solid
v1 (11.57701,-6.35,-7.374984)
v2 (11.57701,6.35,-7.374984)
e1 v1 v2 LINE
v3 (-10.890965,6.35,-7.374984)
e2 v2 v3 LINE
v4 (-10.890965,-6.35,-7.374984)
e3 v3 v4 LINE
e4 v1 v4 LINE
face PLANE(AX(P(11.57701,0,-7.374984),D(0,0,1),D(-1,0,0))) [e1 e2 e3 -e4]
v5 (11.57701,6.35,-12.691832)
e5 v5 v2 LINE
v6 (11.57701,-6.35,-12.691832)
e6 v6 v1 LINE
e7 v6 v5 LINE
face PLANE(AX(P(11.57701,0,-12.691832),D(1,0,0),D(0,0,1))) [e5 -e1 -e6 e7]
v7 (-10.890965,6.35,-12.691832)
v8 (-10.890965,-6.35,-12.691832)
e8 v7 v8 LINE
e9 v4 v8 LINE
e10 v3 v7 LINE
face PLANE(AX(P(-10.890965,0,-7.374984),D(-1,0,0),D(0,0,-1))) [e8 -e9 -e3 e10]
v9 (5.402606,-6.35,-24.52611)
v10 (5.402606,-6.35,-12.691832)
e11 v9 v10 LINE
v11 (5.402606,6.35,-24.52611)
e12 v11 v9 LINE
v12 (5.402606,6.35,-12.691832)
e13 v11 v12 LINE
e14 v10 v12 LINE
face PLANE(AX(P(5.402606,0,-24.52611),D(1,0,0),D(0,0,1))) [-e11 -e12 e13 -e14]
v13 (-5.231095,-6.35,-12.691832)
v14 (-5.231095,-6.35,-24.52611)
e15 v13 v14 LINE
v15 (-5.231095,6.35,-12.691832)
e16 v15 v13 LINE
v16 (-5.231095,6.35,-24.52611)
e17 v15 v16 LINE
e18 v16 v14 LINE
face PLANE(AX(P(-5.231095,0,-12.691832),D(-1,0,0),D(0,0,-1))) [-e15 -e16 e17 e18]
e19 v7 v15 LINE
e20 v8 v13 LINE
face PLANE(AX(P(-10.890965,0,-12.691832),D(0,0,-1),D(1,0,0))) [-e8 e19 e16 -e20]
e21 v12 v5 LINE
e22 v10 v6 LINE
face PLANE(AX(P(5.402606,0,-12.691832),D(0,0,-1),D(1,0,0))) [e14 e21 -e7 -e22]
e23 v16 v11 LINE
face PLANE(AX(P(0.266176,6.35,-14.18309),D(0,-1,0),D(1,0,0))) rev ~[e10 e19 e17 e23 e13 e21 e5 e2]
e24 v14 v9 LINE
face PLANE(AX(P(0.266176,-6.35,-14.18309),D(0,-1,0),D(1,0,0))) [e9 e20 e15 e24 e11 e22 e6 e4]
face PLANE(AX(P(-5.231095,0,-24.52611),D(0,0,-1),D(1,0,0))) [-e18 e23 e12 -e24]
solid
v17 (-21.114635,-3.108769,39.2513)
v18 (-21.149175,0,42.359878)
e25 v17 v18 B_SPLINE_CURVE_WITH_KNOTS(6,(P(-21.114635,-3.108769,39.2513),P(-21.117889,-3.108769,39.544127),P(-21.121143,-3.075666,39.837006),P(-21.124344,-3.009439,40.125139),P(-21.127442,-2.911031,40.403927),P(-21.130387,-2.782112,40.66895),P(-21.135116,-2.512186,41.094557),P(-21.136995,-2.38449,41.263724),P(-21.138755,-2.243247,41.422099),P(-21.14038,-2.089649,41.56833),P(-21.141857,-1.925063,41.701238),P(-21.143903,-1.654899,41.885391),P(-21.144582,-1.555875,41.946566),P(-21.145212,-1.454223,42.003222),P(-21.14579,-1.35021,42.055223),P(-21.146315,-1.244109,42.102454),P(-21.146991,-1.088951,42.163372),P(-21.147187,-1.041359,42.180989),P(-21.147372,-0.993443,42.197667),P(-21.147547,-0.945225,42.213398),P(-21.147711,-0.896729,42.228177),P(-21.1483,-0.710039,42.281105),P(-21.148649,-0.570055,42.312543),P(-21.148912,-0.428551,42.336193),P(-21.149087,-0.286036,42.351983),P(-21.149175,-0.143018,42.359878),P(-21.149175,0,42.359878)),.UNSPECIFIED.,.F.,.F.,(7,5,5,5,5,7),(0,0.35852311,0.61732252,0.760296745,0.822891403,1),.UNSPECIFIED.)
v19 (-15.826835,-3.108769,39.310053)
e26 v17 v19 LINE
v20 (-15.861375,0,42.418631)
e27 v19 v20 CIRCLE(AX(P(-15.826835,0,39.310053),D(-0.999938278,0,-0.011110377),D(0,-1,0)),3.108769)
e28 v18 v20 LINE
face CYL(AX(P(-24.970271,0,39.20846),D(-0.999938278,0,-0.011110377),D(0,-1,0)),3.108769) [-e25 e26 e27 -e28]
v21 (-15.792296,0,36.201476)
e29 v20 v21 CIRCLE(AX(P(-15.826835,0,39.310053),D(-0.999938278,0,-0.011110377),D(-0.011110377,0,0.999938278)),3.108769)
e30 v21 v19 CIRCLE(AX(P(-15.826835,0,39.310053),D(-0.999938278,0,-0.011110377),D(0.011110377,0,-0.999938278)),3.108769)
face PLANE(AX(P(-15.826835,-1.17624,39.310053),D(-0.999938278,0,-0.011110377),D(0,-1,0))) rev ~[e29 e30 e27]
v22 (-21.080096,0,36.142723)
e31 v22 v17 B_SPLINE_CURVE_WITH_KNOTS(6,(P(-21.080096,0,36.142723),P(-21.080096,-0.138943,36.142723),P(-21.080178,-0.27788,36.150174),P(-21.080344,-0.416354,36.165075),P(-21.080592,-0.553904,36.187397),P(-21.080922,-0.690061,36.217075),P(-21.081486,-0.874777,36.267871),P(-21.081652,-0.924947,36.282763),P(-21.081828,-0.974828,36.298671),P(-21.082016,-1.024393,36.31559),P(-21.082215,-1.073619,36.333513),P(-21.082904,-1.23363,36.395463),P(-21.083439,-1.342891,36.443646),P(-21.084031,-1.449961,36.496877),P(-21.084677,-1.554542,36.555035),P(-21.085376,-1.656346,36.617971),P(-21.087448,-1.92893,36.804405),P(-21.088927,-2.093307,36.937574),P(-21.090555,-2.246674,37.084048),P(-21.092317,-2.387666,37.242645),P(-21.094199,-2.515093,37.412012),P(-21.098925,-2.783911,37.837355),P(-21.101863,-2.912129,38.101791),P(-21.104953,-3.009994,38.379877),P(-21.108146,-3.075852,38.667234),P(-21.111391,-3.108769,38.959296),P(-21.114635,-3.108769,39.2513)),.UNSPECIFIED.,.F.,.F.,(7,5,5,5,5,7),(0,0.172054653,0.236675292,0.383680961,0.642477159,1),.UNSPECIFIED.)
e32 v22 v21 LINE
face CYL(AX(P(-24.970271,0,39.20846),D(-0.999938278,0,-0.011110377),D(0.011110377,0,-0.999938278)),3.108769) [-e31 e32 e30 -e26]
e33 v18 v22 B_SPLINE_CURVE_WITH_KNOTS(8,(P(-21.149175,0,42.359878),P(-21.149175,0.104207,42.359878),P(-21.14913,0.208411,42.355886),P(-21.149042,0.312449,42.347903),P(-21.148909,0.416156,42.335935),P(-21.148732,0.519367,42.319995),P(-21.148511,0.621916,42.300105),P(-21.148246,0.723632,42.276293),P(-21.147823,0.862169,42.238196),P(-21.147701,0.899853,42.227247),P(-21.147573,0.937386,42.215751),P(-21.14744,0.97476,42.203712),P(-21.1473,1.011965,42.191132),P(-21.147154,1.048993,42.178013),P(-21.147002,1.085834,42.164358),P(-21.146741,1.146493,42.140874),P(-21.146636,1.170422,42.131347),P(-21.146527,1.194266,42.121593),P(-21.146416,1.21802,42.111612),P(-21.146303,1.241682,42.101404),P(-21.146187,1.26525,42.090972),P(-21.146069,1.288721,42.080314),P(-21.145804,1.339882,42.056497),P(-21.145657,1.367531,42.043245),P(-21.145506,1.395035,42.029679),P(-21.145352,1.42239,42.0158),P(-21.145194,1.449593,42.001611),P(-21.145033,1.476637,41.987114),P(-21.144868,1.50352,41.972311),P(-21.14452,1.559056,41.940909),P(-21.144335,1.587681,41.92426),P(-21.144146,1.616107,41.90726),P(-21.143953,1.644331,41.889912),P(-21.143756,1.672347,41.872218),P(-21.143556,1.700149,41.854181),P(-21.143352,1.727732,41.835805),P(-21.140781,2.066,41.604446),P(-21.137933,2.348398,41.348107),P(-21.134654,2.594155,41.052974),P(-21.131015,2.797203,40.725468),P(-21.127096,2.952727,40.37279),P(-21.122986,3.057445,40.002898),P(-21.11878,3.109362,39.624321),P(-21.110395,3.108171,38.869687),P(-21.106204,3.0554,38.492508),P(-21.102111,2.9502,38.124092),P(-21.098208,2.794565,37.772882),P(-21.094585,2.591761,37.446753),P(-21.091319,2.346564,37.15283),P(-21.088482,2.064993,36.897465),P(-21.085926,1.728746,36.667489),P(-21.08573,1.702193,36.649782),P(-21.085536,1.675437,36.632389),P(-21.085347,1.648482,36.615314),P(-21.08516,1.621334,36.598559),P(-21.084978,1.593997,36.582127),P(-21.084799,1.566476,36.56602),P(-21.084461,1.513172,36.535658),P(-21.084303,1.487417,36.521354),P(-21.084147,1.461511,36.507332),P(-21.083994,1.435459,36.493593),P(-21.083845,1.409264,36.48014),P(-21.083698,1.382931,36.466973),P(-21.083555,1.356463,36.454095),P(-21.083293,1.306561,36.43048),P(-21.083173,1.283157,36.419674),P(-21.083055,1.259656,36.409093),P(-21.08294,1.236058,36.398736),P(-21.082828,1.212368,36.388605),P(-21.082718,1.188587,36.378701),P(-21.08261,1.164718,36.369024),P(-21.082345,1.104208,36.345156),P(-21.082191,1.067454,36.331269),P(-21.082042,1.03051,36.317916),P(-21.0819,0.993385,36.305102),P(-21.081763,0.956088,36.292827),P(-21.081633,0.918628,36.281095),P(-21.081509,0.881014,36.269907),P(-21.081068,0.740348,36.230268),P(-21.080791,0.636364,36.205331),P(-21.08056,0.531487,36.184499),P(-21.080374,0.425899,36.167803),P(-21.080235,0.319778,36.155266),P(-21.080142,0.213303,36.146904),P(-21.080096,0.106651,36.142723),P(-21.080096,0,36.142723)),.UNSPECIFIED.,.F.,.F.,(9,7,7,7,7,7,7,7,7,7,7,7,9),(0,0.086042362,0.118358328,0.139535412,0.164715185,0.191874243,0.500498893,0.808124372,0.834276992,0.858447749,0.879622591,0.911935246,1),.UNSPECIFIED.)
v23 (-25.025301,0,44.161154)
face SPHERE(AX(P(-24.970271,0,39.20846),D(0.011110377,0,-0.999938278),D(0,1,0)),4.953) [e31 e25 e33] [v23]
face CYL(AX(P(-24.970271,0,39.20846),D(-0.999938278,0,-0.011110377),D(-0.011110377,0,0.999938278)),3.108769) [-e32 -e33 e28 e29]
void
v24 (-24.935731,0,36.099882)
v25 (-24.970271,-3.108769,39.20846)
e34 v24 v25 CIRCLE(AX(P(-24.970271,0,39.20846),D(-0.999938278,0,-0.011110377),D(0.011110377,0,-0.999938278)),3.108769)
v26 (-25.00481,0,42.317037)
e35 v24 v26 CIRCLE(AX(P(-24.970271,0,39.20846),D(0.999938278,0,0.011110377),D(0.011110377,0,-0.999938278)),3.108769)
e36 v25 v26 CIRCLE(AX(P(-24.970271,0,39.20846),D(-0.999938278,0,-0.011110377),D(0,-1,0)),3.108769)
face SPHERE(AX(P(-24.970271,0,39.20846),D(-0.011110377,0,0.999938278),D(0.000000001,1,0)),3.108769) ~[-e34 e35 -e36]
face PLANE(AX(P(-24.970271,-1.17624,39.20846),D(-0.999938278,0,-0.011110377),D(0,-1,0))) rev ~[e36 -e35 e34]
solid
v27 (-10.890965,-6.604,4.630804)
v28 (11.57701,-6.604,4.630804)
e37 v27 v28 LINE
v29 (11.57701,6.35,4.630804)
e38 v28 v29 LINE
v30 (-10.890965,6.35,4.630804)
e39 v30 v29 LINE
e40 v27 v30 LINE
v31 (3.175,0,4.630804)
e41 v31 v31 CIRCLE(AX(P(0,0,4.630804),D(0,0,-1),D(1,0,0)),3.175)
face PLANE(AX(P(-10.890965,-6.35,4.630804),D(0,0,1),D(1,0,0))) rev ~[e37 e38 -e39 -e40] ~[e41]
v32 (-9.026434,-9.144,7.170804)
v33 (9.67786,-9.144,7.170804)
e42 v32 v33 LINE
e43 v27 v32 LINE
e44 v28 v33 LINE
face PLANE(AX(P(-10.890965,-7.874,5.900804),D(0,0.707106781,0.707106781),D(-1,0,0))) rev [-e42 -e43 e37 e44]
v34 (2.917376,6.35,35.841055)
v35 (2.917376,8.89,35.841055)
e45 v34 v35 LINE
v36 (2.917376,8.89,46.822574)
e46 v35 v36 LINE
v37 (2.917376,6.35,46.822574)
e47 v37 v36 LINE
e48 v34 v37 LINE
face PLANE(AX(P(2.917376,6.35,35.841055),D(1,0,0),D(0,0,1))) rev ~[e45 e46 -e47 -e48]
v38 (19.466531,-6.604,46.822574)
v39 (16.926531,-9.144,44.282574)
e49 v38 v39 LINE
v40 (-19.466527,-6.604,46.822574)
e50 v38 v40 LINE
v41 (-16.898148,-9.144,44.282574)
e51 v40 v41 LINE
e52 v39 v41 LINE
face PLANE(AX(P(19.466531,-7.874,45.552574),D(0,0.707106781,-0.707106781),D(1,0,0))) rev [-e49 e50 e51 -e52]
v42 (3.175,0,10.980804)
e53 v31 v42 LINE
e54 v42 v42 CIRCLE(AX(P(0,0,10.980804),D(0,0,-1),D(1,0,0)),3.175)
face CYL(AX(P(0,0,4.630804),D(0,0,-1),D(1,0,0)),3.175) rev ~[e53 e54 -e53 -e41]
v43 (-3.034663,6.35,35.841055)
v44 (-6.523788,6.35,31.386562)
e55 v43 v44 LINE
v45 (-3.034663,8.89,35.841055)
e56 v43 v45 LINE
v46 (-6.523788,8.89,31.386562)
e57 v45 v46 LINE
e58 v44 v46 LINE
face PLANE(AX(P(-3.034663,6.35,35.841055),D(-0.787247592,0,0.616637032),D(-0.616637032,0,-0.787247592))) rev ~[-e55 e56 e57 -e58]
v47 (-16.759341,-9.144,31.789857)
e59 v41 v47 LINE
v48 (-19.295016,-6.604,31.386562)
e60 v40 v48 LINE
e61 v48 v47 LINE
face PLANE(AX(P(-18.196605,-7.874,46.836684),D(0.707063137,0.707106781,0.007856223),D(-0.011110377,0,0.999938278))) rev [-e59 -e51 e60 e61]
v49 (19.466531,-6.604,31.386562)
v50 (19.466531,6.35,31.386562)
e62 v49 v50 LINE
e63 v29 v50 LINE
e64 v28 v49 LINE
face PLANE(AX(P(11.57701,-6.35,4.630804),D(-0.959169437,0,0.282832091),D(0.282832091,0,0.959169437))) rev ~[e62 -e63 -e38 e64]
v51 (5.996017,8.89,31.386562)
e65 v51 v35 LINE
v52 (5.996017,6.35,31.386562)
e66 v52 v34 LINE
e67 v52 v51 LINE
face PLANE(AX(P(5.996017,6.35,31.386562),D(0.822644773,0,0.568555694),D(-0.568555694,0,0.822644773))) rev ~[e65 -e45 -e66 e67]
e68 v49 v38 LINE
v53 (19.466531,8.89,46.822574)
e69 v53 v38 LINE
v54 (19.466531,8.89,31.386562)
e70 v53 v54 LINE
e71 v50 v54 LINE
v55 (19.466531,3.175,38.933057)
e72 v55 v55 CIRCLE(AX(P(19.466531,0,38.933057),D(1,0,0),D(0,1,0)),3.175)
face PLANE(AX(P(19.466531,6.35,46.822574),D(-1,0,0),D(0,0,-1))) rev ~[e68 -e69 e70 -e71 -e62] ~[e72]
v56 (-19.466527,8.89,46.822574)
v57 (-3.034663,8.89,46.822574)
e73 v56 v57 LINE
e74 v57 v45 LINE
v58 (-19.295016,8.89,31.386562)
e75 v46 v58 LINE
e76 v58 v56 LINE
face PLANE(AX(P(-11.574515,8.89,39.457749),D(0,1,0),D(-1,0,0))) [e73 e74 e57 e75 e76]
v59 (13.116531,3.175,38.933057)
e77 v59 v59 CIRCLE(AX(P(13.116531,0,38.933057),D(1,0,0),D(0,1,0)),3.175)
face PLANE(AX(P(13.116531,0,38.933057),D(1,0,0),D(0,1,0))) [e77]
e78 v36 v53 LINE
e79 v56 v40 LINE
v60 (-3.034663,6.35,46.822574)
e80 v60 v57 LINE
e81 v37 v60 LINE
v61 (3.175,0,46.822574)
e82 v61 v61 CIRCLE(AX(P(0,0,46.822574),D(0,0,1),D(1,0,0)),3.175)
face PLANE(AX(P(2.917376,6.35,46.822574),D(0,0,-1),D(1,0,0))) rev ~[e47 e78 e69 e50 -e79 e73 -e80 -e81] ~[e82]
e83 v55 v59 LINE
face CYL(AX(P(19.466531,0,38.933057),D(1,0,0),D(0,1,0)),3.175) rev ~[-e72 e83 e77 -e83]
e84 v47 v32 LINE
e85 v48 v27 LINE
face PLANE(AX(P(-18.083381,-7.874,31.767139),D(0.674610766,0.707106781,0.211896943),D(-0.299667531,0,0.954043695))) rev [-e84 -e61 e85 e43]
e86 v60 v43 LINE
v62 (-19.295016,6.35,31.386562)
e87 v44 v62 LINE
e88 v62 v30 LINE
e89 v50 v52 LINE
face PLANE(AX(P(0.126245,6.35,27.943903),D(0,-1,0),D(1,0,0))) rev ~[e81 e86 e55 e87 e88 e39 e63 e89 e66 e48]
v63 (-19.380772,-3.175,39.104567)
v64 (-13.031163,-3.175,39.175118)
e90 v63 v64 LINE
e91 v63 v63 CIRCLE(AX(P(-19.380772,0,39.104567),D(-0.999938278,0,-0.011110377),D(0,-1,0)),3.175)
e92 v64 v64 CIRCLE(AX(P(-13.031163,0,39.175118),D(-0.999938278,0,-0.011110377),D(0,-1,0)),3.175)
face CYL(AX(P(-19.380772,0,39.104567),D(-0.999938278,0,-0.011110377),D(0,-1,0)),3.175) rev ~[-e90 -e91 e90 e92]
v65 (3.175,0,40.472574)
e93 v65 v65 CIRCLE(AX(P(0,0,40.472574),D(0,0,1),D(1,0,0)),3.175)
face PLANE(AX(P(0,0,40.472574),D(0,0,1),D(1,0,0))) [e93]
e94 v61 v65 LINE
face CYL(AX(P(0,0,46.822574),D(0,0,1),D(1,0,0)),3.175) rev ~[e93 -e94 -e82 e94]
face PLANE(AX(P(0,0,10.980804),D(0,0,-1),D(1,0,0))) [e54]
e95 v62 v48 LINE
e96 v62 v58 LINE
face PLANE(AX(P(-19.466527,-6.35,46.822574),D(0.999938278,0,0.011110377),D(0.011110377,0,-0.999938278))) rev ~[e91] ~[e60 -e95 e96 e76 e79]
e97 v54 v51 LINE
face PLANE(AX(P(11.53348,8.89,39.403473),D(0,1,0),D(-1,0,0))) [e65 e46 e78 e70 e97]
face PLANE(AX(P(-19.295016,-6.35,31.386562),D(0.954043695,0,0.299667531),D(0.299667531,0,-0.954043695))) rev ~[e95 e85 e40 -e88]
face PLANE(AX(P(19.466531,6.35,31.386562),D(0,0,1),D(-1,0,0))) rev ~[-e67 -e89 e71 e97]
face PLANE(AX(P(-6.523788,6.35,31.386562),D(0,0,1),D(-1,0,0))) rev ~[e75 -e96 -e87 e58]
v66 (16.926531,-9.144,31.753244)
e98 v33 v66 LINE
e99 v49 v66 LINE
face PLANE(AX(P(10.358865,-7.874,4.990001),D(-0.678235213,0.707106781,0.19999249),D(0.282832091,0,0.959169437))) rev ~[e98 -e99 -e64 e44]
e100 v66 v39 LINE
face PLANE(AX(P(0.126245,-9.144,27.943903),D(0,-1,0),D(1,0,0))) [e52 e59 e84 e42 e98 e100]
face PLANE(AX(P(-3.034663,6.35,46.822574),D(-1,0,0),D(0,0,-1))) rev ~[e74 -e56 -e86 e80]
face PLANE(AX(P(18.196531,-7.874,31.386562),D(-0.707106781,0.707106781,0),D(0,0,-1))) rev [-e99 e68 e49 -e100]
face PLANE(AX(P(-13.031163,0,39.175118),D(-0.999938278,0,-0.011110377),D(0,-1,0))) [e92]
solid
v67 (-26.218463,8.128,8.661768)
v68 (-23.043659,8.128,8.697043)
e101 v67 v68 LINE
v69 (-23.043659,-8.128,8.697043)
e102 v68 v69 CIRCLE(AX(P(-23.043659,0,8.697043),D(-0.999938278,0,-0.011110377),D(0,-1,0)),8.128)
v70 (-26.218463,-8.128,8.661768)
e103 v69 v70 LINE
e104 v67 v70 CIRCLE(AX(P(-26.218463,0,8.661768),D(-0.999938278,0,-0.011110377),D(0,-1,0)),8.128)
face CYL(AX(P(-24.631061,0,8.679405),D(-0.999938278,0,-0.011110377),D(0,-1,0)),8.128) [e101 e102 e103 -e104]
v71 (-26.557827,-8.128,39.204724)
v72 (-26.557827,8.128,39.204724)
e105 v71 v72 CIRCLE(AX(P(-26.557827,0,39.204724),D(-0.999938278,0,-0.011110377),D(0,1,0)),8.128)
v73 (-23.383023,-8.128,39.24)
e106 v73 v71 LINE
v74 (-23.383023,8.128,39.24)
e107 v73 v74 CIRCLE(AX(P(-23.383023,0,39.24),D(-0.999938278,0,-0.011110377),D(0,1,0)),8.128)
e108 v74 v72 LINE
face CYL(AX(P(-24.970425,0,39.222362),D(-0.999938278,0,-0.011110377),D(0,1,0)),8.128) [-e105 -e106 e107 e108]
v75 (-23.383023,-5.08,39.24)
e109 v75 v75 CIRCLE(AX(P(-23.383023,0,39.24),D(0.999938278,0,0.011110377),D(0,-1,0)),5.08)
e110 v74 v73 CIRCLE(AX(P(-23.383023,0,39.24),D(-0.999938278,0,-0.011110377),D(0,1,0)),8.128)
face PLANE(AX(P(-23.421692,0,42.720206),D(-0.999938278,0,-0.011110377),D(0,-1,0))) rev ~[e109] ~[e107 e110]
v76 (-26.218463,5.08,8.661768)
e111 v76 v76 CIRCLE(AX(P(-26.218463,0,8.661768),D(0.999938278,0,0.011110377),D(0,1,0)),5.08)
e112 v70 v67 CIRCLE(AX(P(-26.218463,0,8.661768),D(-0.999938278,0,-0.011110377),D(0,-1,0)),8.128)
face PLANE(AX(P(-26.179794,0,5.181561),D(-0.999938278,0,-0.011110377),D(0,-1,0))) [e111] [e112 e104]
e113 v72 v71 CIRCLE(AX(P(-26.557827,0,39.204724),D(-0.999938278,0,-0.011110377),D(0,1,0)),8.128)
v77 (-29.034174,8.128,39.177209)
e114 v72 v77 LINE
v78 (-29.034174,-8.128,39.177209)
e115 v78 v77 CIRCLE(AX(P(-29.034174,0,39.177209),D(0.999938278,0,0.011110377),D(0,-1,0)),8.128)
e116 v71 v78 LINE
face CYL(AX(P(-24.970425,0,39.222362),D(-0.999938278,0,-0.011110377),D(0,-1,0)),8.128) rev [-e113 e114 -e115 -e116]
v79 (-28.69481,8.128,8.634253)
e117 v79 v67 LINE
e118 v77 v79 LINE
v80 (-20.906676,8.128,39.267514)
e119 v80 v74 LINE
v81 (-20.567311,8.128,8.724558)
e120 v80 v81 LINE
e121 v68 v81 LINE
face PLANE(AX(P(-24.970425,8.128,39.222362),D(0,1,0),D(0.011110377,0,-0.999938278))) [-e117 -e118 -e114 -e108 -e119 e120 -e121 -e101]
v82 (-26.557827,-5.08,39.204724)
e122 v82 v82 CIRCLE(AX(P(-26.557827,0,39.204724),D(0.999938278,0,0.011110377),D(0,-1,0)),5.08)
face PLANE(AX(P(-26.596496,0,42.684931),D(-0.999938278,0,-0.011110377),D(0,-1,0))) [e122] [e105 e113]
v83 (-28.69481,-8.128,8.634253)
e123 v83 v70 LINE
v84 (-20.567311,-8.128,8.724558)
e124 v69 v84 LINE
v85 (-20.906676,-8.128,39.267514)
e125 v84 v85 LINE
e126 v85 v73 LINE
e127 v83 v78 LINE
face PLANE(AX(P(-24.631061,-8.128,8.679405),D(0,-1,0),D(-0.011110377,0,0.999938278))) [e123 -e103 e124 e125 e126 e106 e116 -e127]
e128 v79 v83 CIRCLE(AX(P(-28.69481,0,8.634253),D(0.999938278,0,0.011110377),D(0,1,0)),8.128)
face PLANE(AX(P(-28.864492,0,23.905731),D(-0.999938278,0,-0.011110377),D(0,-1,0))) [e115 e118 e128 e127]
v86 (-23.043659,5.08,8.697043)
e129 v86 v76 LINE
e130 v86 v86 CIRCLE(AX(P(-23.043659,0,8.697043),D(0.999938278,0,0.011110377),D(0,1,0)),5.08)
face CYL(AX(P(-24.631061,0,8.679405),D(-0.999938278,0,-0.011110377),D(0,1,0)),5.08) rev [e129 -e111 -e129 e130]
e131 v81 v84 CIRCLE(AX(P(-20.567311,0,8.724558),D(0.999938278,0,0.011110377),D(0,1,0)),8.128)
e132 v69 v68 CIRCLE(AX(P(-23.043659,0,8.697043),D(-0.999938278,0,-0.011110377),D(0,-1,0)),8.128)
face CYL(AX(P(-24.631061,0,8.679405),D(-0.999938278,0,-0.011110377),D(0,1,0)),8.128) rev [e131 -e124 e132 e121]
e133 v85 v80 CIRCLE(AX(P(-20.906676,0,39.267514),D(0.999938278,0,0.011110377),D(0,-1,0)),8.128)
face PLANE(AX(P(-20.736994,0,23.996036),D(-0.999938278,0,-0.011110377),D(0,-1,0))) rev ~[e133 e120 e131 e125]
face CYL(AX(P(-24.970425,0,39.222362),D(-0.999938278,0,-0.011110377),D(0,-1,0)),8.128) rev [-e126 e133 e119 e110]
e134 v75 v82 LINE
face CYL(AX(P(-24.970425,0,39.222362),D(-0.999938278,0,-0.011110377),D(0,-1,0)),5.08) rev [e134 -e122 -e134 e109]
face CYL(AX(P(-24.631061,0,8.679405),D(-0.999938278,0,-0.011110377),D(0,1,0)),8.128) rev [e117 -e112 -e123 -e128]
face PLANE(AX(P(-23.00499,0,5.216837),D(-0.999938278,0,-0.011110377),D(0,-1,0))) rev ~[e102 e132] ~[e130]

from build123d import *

# Parameters (mm, degrees)
F1_DEPTH  = 6.35
F2_R      = 3.175
F3_DEPTH  = 6.35
F4_R      = 3.175
F5_DEPTH  = 6.35
F6_R      = 3.175
F7_DEPTH  = 6.35
F8_R      = 3.175
F9_DEPTH  = 6.35
F11_DEPTH = 2.794
F12_SIZE  = 2.54
F14_DEPTH = 2.54
F17_DEPTH = 1.5875
F18_DEPTH = 4.064
F21_DEPTH = 9.144


with BuildPart() as f1:
    # F0 (on Front) → F1 (new body, symmetric)
    with BuildSketch(Plane.XZ):
        Polygon((19.4665305316, 46.8225739896), (-19.4665268064, 46.8225739896), (-19.2950163037, 31.3865616918), (-10.89096535, 4.6308040619), (11.5770100861, 4.6308040619), (19.4665305316, 31.3865616918), align=None)
    extrude(amount=F1_DEPTH, both=True)

    # F2 (on face) → F3 (cut)
    with BuildSketch(Plane(origin=(-18.9439395066, 0, -0.2104873024), x_dir=(0, -1, 0), z_dir=(-0.9999382779, 0, -0.011110377))):
        with Locations((0, 39.3174812198)):
            Circle(F2_R)
    extrude(amount=-F3_DEPTH, mode=Mode.SUBTRACT)

    # F4 (on face) → F5 (cut)
    with BuildSketch(Plane.YZ.offset(19.4665305316)):
        with Locations((0, 38.933057338)):
            Circle(F4_R)
    extrude(amount=-F5_DEPTH, mode=Mode.SUBTRACT)

    # F6 (on face) → F7 (cut)
    with BuildSketch(Plane.XY.offset(46.8225739896)):
        Circle(F6_R)
    extrude(amount=-F7_DEPTH, mode=Mode.SUBTRACT)

    # F8 (on face) → F9 (cut)
    with BuildSketch(Plane(origin=(0, 0, 4.6308040619), x_dir=(1, 0, 0), z_dir=(0, 0, -1))):
        Circle(F8_R)
    extrude(amount=-F9_DEPTH, mode=Mode.SUBTRACT)

    # F10 (on face) → F11 (join)
    with BuildSketch(Plane.XZ.offset(6.35)):
        Polygon((19.4665305316, 31.3865616918), (19.4665305316, 46.8225739896), (-19.4665268064, 46.8225739896), (-19.2950163037, 31.3865616918), (-10.89096535, 4.6308040619), (11.5770100861, 4.6308040619), align=None)
    extrude(amount=F11_DEPTH)

    # F12
    f12_edges = [f1.edges().sort_by_distance(p)[0] for p in [
        (-19.380772, -9.144, 39.104568),
        (19.466531, -9.144, 39.104568),
        (2e-06, -9.144, 46.822574),
        (0.343022, -9.144, 4.630804),
        (-15.092991, -9.144, 18.008683),
        (15.52177, -9.144, 18.008683),
    ]]
    chamfer(f12_edges, length=F12_SIZE)

    # F13 (on face) → F14 (join)
    with BuildSketch(Plane(origin=(0, 6.35, 0), x_dir=(-1, 0, 0), z_dir=(0, 1, 0))):
        Polygon((-19.4665305316, 46.8225739896), (-19.4665305316, 31.3865616918), (-5.9960167855, 31.3865616918), (-2.9173761141, 35.8410552144), (-2.9173761141, 46.8225739896), align=None)
        Polygon((19.4665268064, 46.8225739896), (3.034662921, 46.8225739896), (3.034662921, 35.8410552144), (6.523788441, 31.3865616918), (19.2950163037, 31.3865616918), align=None)
    extrude(amount=F14_DEPTH)


with BuildPart() as f1b:
    # F0 (on Front) → F1, piece 2 (new body, symmetric)
    with BuildSketch(Plane.XZ):
        Polygon((11.5770100861, -7.3749837466), (-10.89096535, -7.3749837466), (-10.89096535, -12.6918321475), (-5.2310945466, -12.6918321475), (-5.2310945466, -24.526109919), (5.402605515, -24.526109919), (5.402605515, -12.6918321475), (11.5770100861, -12.6918321475), align=None)
    extrude(amount=F1_DEPTH, both=True)


with BuildPart() as f17:
    # F16 (on offset) → F17 (new body, symmetric)
    with BuildSketch(Plane(origin=(-24.5315946033, 0, -0.2725720893), x_dir=(0, -1, 0), z_dir=(-0.9999382779, 0, -0.011110377))):
        with BuildLine():
            Line((5.08, 39.497371763), (8.128, 39.497371763))
            ThreePointArc((8.128, 39.497371763), (0, 47.625371763), (-8.128, 39.497371763))
            Line((-8.128, 39.497371763), (-5.08, 39.497371763))
            ThreePointArc((-5.08, 39.497371763), (0, 44.577371763), (5.08, 39.497371763))
        make_face()
        with BuildLine():
            ThreePointArc((-8.128, 39.497371763), (0, 31.369371763), (8.128, 39.497371763))
            Line((8.128, 39.497371763), (5.08, 39.497371763))
            ThreePointArc((5.08, 39.497371763), (0, 34.417371763), (-5.08, 39.497371763))
            Line((-5.08, 39.497371763), (-8.128, 39.497371763))
        make_face()
    extrude(amount=F17_DEPTH, both=True)



with BuildPart() as f17b:
    # F16 (on offset) → F17, piece 2 (new body, symmetric)
    with BuildSketch(Plane(origin=(-24.5315946033, 0, -0.2725720893), x_dir=(0, -1, 0), z_dir=(-0.9999382779, 0, -0.011110377))):
        with BuildLine():
            ThreePointArc((-8.128, 8.9525301009), (0, 0.8245301009), (8.128, 8.9525301009))
            Line((8.128, 8.9525301009), (5.08, 8.9525301009))
            ThreePointArc((5.08, 8.9525301009), (0, 3.8725301009), (-5.08, 8.9525301009))
            Line((-5.08, 8.9525301009), (-8.128, 8.9525301009))
        make_face()
        with BuildLine():
            Line((5.08, 8.9525301009), (8.128, 8.9525301009))
            ThreePointArc((8.128, 8.9525301009), (0, 17.0805301009), (-8.128, 8.9525301009))
            Line((-8.128, 8.9525301009), (-5.08, 8.9525301009))
            ThreePointArc((-5.08, 8.9525301009), (0, 14.0325301009), (5.08, 8.9525301009))
        make_face()
    extrude(amount=F17_DEPTH, both=True)


with BuildPart() as f17_1:
    add(f17.part)

    add(f17b.part)  # F18 merges F17b
    # F16 (on offset) → F18 (join, symmetric)
    with BuildSketch(Plane(origin=(-24.5315946033, 0, -0.2725720893), x_dir=(0, -1, 0), z_dir=(-0.9999382779, 0, -0.011110377))):
        with BuildLine():
            Line((8.128, 8.9525301009), (8.128, 39.497371763))
            ThreePointArc((8.128, 39.497371763), (0, 31.369371763), (-8.128, 39.497371763))
            Line((-8.128, 39.497371763), (-8.128, 8.9525301009))
            ThreePointArc((-8.128, 8.9525301009), (0, 17.0805301009), (8.128, 8.9525301009))
        make_face()
    extrude(amount=F18_DEPTH, both=True)


with BuildPart() as f20:
    # F19 (on offset) → F20 (revolve)
    with BuildSketch(Plane(origin=(-24.5315946033, 0, -0.2725720893), x_dir=(0, -1, 0), z_dir=(-0.9999382779, 0, -0.011110377))):
        with BuildLine():
            Line((0, 42.5922383981), (0, 44.4364689796))
            ThreePointArc((0, 44.4364689796), (-4.953, 39.4834689796), (0, 34.5304689796))
            Line((0, 34.5304689796), (0, 36.3746995611))
            ThreePointArc((0, 36.3746995611), (-3.1087694185, 39.4834689796), (0, 42.5922383981))
        make_face()
    revolve(axis=Axis((-24.9702708307, 0, 39.208459886), (0.011110377, 0, -0.9999382779)))

    # F19 (on offset) → F21 (join)
    with BuildSketch(Plane(origin=(-24.5315946033, 0, -0.2725720893), x_dir=(0, -1, 0), z_dir=(-0.9999382779, 0, -0.011110377))):
        with BuildLine():
            ThreePointArc((3.1087694185, 39.4834689796), (2.1982319369, 41.6817009165), (0, 42.5922383981))
            Line((0, 42.5922383981), (0, 36.3746995611))
            ThreePointArc((0, 36.3746995611), (2.1982319369, 37.2852370427), (3.1087694185, 39.4834689796))
        make_face()
        with BuildLine():
            Line((0, 36.3746995611), (0, 42.5922383981))
            ThreePointArc((0, 42.5922383981), (-3.1087694185, 39.4834689796), (0, 36.3746995611))
        make_face()
    extrude(amount=-F21_DEPTH)


solid = Compound([f1.part, f1b.part, f17_1.part, f20.part])
